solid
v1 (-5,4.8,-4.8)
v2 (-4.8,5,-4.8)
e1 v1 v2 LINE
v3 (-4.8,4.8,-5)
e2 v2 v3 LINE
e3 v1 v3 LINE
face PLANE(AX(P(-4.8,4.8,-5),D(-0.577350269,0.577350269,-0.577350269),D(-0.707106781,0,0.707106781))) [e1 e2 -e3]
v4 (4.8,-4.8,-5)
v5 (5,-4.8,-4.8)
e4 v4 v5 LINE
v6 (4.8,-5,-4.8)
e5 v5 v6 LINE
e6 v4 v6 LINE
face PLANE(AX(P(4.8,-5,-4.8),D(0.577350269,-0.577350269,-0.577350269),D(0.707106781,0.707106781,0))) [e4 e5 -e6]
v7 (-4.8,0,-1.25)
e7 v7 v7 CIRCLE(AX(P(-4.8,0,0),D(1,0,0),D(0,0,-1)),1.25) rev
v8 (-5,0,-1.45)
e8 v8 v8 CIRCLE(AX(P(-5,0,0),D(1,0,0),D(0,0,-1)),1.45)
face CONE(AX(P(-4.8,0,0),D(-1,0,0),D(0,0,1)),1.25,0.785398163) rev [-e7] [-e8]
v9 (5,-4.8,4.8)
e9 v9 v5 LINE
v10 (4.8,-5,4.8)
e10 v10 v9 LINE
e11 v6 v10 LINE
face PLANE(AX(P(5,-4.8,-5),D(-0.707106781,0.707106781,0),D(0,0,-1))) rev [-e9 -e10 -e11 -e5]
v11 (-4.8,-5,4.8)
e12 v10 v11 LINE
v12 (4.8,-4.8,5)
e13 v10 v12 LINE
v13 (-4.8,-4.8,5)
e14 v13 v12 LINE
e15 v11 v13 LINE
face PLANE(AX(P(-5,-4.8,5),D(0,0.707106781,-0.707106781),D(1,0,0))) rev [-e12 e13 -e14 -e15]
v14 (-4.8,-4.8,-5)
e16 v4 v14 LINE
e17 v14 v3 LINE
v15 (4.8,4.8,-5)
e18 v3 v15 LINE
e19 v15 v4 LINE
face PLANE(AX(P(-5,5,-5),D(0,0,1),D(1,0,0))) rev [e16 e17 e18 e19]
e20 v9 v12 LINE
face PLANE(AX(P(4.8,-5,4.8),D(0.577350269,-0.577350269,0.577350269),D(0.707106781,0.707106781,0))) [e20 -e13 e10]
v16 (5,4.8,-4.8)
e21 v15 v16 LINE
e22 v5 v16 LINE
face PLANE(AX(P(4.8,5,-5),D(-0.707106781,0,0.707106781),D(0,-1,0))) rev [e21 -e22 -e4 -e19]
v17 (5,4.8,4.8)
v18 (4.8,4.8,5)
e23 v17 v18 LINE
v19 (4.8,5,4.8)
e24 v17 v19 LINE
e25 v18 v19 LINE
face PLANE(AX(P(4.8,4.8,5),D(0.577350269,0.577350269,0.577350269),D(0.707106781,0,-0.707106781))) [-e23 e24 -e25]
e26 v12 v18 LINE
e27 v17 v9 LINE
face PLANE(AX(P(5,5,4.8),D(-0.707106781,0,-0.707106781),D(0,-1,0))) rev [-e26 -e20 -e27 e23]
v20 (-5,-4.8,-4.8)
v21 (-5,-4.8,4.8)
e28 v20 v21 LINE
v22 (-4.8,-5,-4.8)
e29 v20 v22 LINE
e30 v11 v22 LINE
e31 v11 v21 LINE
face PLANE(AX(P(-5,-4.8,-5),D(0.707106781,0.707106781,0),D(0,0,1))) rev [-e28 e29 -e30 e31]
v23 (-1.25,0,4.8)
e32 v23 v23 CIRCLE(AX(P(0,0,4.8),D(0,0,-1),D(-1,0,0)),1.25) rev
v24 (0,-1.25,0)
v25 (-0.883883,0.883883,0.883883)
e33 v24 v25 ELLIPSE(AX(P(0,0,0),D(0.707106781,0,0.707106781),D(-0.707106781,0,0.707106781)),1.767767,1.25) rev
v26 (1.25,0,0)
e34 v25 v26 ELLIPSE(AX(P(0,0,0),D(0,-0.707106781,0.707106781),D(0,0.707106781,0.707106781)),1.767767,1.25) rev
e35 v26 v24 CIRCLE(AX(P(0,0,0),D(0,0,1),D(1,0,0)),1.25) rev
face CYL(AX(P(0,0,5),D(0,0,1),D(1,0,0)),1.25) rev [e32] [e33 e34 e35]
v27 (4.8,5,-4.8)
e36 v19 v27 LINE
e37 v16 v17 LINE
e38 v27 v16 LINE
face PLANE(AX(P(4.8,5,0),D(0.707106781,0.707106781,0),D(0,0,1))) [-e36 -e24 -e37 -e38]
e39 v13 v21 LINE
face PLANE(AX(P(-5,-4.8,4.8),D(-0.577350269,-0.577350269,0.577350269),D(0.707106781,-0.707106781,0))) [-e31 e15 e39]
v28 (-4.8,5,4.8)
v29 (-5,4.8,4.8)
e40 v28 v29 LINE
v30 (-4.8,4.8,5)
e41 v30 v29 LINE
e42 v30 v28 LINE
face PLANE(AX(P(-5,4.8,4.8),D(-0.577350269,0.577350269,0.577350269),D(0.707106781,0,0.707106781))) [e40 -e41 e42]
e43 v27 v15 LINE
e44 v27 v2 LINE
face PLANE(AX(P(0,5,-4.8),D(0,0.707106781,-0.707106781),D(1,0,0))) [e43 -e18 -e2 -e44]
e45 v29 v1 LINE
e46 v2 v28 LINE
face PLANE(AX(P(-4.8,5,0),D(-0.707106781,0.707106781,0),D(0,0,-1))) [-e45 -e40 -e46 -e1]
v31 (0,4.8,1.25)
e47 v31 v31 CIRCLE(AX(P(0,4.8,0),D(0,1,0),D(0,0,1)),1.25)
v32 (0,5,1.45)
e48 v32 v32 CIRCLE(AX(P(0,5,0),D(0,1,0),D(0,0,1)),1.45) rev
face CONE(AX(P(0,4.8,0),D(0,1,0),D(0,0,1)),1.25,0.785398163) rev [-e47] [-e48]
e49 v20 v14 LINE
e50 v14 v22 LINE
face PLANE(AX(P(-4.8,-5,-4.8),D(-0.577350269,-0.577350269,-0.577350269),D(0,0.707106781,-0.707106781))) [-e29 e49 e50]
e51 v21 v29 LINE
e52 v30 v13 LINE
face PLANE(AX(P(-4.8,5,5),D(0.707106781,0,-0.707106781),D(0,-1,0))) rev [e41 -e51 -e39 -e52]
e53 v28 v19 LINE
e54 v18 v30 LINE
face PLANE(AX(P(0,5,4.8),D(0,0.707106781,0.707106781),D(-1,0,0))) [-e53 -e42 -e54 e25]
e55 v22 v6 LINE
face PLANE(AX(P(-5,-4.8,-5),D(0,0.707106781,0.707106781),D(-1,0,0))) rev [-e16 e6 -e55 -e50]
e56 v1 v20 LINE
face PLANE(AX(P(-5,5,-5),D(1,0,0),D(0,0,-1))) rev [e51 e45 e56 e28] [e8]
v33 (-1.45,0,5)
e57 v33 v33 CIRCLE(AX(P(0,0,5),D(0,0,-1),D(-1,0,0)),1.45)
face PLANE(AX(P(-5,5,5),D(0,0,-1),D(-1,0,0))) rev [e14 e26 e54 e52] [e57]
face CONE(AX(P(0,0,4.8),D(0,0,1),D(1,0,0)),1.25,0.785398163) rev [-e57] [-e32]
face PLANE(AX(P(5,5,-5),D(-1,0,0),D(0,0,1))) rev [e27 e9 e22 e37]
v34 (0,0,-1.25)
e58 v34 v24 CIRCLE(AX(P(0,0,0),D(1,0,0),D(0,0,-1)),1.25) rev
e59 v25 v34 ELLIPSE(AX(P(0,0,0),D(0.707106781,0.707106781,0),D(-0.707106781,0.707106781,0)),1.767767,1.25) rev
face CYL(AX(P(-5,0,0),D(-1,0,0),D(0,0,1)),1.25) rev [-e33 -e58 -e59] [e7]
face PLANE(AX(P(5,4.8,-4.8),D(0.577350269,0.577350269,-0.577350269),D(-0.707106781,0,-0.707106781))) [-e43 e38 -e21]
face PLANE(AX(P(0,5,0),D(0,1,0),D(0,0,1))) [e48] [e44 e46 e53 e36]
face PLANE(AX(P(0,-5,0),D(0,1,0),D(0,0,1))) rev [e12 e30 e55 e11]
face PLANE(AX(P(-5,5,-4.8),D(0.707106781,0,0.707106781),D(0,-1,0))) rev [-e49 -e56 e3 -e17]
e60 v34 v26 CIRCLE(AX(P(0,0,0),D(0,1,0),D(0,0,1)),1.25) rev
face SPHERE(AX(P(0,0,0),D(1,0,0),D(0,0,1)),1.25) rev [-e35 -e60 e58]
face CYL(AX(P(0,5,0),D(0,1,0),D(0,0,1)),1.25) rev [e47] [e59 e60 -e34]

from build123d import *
from OCP.BRepAlgoAPI import BRepAlgoAPI_Cut
from OCP.TopTools import TopTools_ListOfShape

# Parameters (mm, degrees)
SKETCH_1_W                 = 10
SKETCH_1_H                 = 10
EXTRUDE_1_DEPTH            = 5
HOLE_WIZARD_M3_1_D         = 2.5
HOLE_WIZARD_M3_1_DEPTH     = 4.999
HOLE_WIZARD_M3_2_OUTLINE_R = 1.25
HOLE_WIZARD_M3_2_DEPTH     = 5
HOLE_START                 = -5
HOLE_WIZARD_M3_3_OUTLINE_R = 1.25
HOLE_WIZARD_M3_3_DEPTH     = 5
CHAMFER_1_SIZE             = 0.2


with BuildPart() as part:
    # 草图1 → 凸台-拉伸1 (new, symmetric)
    with BuildSketch(Plane(origin=(0, 0, 0), x_dir=(1, 0, 0), z_dir=(0, 1, 0))):
        Rectangle(SKETCH_1_W, SKETCH_1_H)
    extrude(amount=EXTRUDE_1_DEPTH, both=True)

    # M3 螺纹孔1
    with Locations(Plane.XY.offset(5)):
        with Locations((0, 0)):
            Hole(HOLE_WIZARD_M3_1_D / 2, depth=HOLE_WIZARD_M3_1_DEPTH)


with BuildPart() as hole_wizard_m3_2_tool:
    # M3 螺纹孔2: read off the stored shape, not the designer's step
    # M3 螺纹孔2 outline → M3 螺纹孔2 (new body)
    with BuildSketch(Plane(origin=(0, 0, 0), x_dir=(1, 0, 0), z_dir=(0, 1, 0))):
        Circle(HOLE_WIZARD_M3_2_OUTLINE_R)
    extrude(amount=HOLE_WIZARD_M3_2_DEPTH)


with BuildPart() as part_1:
    add(part.part)

    # M3 螺纹孔2: cut by hole_wizard_m3_2_tool, with a tolerance
    hole_wizard_m3_2_stock = TopTools_ListOfShape()
    hole_wizard_m3_2_stock.Append(part_1.part.wrapped)
    hole_wizard_m3_2_tools = TopTools_ListOfShape()
    hole_wizard_m3_2_tools.Append(hole_wizard_m3_2_tool.part.wrapped)
    hole_wizard_m3_2_cut = BRepAlgoAPI_Cut()
    hole_wizard_m3_2_cut.SetArguments(hole_wizard_m3_2_stock)
    hole_wizard_m3_2_cut.SetTools(hole_wizard_m3_2_tools)
    hole_wizard_m3_2_cut.SetFuzzyValue(0.00001)
    hole_wizard_m3_2_cut.Build()
    add(Compound.cast(hole_wizard_m3_2_cut.Shape()).solids(), mode=Mode.REPLACE)

    # M3 螺纹孔3: read off the stored shape, not the designer's step
    # M3 螺纹孔3 outline → M3 螺纹孔3 (cut)
    with BuildSketch(Plane.YZ.offset(HOLE_START)):
        Circle(HOLE_WIZARD_M3_3_OUTLINE_R)
    extrude(amount=HOLE_WIZARD_M3_3_DEPTH, mode=Mode.SUBTRACT)

    # 草图7 → 切除-旋转1 (revolve, cut)
    with BuildSketch(Plane(origin=(0, 0, 0), x_dir=(1, 0, 0), z_dir=(0, 1, 0))):
        with BuildLine():
            Line((-1.25, 0), (1.25, 0))
            ThreePointArc((1.25, 0), (0, 1.25), (-1.25, 0))
        make_face()
    revolve(axis=Axis((0, 0, 0), (-1, 0, 0)), mode=Mode.SUBTRACT)

    # 倒角1
    chamfer_1_edges = [part_1.edges().sort_by_distance(p)[0] for p in [
        (-5, 5, 0),
        (1.25, 0, 5),
        (0, 5, 5),
        (-1.25, 5, 0),
        (-5, -1.25, 0),
        (5, 5, 0),
        (0, -5, 5),
        (-5, -5, 0),
        (0, -5, -5),
        (5, -5, 0),
        (5, 0, 5),
        (-5, 0, 5),
        (-5, 0, -5),
        (5, 0, -5),
        (0, 5, -5),
    ]]
    chamfer(chamfer_1_edges, length=CHAMFER_1_SIZE)


solid = part_1.part
